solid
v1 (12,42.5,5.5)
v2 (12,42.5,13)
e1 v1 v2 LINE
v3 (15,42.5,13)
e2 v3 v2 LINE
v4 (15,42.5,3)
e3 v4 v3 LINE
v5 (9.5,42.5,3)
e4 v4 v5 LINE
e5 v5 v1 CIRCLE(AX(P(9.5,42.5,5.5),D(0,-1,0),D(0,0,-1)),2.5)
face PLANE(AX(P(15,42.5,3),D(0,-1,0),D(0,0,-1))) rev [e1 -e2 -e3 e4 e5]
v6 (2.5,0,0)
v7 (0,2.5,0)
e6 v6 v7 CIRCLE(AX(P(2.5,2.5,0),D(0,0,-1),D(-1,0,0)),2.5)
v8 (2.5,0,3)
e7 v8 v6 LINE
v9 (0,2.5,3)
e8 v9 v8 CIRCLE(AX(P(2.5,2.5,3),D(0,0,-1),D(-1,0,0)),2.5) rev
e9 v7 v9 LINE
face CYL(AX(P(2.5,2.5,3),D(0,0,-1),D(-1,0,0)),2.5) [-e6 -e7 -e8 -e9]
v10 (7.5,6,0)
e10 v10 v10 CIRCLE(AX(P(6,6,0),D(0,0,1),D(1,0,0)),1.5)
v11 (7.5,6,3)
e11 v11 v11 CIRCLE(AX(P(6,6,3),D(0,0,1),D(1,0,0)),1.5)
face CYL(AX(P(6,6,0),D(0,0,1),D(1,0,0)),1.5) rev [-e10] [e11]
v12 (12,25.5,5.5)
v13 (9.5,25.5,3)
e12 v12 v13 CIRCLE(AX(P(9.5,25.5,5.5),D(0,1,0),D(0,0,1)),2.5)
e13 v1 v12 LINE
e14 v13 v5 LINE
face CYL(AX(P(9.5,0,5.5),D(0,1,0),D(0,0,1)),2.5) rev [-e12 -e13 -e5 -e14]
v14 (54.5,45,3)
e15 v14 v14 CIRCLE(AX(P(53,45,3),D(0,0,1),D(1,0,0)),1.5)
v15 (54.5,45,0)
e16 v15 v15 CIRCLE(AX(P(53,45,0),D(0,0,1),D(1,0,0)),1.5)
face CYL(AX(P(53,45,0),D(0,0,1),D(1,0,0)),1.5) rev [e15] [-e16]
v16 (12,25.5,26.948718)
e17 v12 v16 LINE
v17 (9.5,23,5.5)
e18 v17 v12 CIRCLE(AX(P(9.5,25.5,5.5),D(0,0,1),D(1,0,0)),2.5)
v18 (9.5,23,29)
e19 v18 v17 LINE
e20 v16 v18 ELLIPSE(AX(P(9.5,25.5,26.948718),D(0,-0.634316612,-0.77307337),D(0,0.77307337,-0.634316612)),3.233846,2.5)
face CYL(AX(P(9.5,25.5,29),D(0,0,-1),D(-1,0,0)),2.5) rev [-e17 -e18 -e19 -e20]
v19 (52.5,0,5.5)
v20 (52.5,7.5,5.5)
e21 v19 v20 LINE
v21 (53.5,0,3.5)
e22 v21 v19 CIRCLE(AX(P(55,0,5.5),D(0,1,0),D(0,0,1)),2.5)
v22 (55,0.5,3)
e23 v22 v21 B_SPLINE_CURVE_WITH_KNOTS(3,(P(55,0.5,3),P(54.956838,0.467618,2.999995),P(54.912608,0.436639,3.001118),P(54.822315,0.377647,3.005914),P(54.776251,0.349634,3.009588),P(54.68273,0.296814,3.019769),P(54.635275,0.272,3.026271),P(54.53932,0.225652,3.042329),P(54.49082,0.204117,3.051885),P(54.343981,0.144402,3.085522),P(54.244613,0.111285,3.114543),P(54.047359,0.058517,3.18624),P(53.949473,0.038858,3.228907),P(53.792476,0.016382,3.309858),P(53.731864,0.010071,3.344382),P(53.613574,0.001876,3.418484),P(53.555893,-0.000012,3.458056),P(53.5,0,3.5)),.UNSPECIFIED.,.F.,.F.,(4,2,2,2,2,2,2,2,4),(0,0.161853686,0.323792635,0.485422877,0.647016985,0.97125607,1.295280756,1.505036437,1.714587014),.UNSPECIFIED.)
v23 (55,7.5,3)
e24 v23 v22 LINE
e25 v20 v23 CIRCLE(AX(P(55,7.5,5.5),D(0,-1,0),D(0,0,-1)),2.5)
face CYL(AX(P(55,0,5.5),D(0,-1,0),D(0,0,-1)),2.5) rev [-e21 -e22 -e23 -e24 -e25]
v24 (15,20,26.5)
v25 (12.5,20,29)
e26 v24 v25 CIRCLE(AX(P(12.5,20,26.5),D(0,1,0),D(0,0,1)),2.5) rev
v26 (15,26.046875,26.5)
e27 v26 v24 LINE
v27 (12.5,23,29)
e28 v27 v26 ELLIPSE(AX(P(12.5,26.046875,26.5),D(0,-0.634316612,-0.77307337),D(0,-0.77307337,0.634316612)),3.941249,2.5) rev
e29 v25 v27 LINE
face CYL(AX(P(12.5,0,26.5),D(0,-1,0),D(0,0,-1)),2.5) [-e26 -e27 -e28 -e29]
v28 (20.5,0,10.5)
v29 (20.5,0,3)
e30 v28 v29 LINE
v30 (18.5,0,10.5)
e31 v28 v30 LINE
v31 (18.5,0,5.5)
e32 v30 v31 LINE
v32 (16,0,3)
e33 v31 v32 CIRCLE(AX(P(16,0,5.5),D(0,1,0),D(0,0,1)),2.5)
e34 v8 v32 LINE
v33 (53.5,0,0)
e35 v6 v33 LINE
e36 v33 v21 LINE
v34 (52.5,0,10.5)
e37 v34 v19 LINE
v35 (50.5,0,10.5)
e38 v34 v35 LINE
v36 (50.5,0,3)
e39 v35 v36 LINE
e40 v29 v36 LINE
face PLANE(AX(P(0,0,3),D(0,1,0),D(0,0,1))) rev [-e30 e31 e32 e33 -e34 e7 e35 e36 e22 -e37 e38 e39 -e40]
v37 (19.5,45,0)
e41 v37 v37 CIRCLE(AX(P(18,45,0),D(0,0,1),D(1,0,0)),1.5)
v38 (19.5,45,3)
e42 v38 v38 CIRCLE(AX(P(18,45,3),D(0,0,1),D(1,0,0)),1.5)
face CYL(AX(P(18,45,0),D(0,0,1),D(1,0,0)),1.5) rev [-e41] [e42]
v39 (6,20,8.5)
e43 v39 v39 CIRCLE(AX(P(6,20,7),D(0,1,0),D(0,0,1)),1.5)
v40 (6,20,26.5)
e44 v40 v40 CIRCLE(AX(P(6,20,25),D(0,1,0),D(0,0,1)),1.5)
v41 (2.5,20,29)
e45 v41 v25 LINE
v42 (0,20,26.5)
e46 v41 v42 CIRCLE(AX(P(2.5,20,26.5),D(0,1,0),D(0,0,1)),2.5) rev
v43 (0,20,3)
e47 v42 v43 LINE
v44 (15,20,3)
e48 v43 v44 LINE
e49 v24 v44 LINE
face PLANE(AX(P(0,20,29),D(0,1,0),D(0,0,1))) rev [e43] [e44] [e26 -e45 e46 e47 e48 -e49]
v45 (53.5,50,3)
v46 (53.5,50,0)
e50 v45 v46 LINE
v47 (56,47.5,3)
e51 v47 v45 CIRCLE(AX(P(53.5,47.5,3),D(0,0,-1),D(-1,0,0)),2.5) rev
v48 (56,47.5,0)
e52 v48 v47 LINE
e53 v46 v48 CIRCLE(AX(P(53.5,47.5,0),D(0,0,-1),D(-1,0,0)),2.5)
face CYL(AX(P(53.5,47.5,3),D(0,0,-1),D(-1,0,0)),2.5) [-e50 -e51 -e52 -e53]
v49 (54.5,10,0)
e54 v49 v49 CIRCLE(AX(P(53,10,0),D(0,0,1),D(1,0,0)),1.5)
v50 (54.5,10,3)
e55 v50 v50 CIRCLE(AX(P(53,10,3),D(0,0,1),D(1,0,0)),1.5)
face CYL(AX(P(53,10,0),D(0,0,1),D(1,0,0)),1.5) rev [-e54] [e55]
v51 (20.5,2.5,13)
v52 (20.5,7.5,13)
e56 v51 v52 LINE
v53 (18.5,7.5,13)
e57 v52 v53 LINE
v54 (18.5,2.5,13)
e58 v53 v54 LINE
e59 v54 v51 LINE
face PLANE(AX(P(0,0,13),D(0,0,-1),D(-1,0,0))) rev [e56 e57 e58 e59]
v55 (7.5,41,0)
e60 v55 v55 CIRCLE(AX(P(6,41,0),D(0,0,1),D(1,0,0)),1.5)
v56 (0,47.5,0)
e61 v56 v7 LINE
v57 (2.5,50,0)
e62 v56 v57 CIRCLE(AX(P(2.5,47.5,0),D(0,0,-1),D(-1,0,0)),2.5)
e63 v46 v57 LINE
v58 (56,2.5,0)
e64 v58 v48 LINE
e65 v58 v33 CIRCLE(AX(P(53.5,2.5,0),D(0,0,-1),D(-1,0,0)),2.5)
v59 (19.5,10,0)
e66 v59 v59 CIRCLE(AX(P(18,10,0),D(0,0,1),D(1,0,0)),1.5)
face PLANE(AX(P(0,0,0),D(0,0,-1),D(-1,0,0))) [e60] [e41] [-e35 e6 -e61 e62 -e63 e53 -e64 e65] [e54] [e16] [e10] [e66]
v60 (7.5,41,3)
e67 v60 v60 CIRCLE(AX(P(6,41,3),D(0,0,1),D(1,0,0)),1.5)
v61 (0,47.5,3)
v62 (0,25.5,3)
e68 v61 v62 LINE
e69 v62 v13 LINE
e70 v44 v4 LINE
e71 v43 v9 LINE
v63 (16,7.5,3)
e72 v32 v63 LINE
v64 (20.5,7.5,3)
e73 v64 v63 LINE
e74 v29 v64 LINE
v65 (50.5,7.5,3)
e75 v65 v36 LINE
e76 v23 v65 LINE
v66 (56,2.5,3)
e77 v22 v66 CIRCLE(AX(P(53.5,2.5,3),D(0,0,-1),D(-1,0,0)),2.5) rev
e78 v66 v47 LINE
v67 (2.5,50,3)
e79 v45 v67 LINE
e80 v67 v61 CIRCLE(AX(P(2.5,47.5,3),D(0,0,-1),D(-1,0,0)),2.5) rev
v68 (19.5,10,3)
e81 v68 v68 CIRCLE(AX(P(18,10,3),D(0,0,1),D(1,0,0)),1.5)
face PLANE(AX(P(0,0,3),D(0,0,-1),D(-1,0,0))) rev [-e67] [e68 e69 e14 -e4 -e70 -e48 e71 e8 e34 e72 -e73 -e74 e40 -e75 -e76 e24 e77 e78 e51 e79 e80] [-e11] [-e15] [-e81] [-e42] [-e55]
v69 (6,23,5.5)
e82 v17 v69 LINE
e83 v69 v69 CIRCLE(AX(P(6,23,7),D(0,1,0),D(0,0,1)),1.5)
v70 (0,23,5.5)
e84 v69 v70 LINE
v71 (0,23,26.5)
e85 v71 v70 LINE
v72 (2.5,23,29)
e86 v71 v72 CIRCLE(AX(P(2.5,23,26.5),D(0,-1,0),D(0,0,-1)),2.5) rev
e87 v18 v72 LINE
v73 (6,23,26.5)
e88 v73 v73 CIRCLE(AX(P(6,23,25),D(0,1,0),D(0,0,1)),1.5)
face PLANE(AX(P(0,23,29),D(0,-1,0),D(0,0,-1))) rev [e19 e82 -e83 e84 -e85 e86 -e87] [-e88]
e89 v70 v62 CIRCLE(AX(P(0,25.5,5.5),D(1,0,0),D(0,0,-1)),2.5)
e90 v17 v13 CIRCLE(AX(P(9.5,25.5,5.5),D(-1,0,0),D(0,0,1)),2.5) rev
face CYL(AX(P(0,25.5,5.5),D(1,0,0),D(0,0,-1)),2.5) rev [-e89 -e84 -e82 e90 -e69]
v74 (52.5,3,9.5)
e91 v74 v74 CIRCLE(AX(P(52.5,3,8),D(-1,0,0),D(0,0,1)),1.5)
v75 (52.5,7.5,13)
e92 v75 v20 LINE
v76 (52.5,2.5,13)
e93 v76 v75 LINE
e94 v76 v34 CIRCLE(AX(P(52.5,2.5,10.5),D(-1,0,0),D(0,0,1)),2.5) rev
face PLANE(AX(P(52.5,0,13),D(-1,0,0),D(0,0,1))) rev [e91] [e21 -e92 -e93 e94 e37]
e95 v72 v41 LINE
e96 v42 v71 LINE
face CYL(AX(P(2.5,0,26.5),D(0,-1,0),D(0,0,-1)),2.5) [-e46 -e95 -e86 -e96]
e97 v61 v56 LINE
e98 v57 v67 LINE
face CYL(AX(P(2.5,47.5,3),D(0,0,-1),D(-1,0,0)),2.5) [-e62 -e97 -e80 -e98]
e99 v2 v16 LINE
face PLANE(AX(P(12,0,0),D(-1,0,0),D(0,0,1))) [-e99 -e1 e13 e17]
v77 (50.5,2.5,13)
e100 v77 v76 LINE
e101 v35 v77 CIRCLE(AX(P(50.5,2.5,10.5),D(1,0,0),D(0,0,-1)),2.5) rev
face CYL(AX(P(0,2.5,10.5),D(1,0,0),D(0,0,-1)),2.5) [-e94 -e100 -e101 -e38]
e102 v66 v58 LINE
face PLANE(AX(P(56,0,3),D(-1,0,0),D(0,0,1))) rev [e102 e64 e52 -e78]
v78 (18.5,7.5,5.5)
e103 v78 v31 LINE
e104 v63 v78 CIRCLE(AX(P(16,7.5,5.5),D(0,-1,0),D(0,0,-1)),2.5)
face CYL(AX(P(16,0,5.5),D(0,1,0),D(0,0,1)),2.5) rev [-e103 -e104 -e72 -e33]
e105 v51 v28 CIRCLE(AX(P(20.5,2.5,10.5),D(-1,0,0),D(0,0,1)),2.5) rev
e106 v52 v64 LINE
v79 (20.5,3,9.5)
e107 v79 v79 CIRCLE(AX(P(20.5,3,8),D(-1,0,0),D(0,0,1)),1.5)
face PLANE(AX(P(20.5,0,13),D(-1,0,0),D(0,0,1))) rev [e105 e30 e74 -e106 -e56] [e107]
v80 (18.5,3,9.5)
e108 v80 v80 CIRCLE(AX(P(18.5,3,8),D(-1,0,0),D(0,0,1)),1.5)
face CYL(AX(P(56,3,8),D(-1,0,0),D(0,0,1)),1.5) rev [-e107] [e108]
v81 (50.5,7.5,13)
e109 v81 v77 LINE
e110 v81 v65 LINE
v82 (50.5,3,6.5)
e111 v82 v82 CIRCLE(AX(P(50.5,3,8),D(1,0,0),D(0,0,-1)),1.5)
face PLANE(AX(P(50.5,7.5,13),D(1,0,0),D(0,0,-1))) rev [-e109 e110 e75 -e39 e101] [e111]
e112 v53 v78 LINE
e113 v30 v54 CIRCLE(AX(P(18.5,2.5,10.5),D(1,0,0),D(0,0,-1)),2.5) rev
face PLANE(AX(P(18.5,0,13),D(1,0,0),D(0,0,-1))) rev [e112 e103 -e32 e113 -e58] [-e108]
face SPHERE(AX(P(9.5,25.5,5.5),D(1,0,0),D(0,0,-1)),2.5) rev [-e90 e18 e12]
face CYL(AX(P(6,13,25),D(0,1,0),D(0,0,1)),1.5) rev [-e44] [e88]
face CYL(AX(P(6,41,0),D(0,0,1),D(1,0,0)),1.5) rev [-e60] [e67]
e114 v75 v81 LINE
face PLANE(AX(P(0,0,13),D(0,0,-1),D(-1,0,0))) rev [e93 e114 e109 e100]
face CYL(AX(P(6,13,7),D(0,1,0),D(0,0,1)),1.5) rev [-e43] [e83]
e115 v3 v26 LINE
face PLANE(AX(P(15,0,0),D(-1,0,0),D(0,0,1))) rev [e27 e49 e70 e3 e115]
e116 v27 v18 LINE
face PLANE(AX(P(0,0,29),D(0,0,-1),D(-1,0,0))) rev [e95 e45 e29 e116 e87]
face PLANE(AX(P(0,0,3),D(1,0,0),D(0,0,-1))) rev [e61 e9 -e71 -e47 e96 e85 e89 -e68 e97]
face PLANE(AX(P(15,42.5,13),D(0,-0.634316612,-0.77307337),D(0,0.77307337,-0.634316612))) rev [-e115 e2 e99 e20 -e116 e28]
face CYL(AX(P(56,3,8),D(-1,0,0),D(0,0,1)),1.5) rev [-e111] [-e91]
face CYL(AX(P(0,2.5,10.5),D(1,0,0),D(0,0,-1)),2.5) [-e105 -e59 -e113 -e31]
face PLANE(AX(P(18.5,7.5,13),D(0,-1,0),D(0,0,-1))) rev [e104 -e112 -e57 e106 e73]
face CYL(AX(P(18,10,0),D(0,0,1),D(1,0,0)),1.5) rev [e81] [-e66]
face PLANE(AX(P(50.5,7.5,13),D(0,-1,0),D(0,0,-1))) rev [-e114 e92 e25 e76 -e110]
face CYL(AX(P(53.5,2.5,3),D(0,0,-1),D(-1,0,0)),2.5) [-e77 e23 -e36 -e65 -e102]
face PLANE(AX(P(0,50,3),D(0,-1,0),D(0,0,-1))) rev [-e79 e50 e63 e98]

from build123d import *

# Parameters (mm, degrees)
SKETCH1_W           = 56
SKETCH1_H           = 50
BOSS_EXTRUDE1_DEPTH = 3
SKETCH2_R           = 1.5
CUT_EXTRUDE1_DEPTH  = 76.133215025
SKETCH3_W           = 12
SKETCH3_H           = 3
BOSS_EXTRUDE2_DEPTH = 26
SKETCH5_R           = 1.5
CUT_EXTRUDE2_DEPTH  = 10
BOSS_EXTRUDE3_DEPTH = 3
SKETCH7_W           = 2
SKETCH7_H           = 7.5
BOSS_EXTRUDE4_DEPTH = 10
SKETCH8_R           = 1.5
CUT_EXTRUDE3_DEPTH  = 69.900290275
FILLET1_R           = 2.5
FILLET2_R           = 2.5
FILLET3_R           = 2.5
FILLET4_R           = 2.5


with BuildPart() as part:
    # Sketch1 → Boss-Extrude1 (new body)
    with BuildSketch(Plane.XY):
        with Locations((28, 25)):
            Rectangle(SKETCH1_W, SKETCH1_H)
    extrude(amount=BOSS_EXTRUDE1_DEPTH)

    # Sketch2 → Cut-Extrude1 (cut, through all)
    with BuildSketch(Plane.XY.offset(3)):
        with Locations((18, 10)):
            Circle(SKETCH2_R)
        with Locations((18, 45)):
            Circle(SKETCH2_R)
        with Locations((53, 45)):
            Circle(SKETCH2_R)
        with Locations((53, 10)):
            Circle(SKETCH2_R)
        with Locations((6, 6)):
            Circle(SKETCH2_R)
        with Locations((6, 41)):
            Circle(SKETCH2_R)
    extrude(amount=-CUT_EXTRUDE1_DEPTH, mode=Mode.SUBTRACT)

    # Sketch3 → Boss-Extrude2 (add)
    with BuildSketch(Plane.XY.offset(3)):
        with Locations((6, 21.5)):
            Rectangle(SKETCH3_W, SKETCH3_H)
    extrude(amount=BOSS_EXTRUDE2_DEPTH)

    # Sketch5 → Cut-Extrude2 (cut)
    with BuildSketch(Plane(origin=(0, 23, 0), x_dir=(1, 0, 0), z_dir=(0, 1, 0))):
        with Locations(Location((6, -7, 0), (0, 0, 270))):
            Circle(SKETCH5_R)
        with Locations(Location((6, -25, 0), (0, 0, 270))):
            Circle(SKETCH5_R)
    extrude(amount=-CUT_EXTRUDE2_DEPTH, mode=Mode.SUBTRACT)

    # Sketch6 → Boss-Extrude3 (add)
    with BuildSketch(Plane(origin=(12, 0, 0), x_dir=(0, 0, -1), z_dir=(1, 0, 0))):
        Polygon((-3, 20), (-29, 20), (-29, 23), (-13, 42.5), (-3, 42.5), align=None)
    extrude(amount=BOSS_EXTRUDE3_DEPTH)

    # Sketch7 → Boss-Extrude4 (add)
    with BuildSketch(Plane.XY.offset(3)):
        with Locations((19.5, 3.75)):
            Rectangle(SKETCH7_W, SKETCH7_H)
        with Locations((51.5, 3.75)):
            Rectangle(SKETCH7_W, SKETCH7_H)
    extrude(amount=BOSS_EXTRUDE4_DEPTH)

    # Sketch8 → Cut-Extrude3 (cut, through all)
    with BuildSketch(Plane.ZY.offset(-18.5)):
        with Locations((8, 3)):
            Circle(SKETCH8_R)
    extrude(amount=-CUT_EXTRUDE3_DEPTH, mode=Mode.SUBTRACT)

    # Fillet1
    fillet1_edges = [part.edges().sort_by_distance(p)[0] for p in [
        (0, 50, 1.5),
        (56, 50, 1.5),
        (56, 0, 1.5),
        (0, 0, 1.5),
    ]]
    fillet(fillet1_edges, radius=FILLET1_R)

    # Fillet2
    fillet2_edges = [part.edges().sort_by_distance(p)[0] for p in [
        (6, 23, 3),
        (12, 23, 16),
        (12, 32.75, 3),
        (18.5, 3.75, 3),
        (52.5, 3.75, 3),
    ]]
    fillet(fillet2_edges, radius=FILLET2_R - 0.0001)  # a hair under: the kernel refuses the full size

    # Fillet3
    fillet3_edges = [part.edges().sort_by_distance(p)[0] for p in [
        (0, 21.5, 29),
        (15, 21.5, 29),
    ]]
    fillet(fillet3_edges, radius=FILLET3_R)

    # Fillet4
    fillet4_edges = [part.edges().sort_by_distance(p)[0] for p in [
        (19.5, 0, 13),
        (51.5, 0, 13),
    ]]
    fillet(fillet4_edges, radius=FILLET4_R)


solid = part.part
